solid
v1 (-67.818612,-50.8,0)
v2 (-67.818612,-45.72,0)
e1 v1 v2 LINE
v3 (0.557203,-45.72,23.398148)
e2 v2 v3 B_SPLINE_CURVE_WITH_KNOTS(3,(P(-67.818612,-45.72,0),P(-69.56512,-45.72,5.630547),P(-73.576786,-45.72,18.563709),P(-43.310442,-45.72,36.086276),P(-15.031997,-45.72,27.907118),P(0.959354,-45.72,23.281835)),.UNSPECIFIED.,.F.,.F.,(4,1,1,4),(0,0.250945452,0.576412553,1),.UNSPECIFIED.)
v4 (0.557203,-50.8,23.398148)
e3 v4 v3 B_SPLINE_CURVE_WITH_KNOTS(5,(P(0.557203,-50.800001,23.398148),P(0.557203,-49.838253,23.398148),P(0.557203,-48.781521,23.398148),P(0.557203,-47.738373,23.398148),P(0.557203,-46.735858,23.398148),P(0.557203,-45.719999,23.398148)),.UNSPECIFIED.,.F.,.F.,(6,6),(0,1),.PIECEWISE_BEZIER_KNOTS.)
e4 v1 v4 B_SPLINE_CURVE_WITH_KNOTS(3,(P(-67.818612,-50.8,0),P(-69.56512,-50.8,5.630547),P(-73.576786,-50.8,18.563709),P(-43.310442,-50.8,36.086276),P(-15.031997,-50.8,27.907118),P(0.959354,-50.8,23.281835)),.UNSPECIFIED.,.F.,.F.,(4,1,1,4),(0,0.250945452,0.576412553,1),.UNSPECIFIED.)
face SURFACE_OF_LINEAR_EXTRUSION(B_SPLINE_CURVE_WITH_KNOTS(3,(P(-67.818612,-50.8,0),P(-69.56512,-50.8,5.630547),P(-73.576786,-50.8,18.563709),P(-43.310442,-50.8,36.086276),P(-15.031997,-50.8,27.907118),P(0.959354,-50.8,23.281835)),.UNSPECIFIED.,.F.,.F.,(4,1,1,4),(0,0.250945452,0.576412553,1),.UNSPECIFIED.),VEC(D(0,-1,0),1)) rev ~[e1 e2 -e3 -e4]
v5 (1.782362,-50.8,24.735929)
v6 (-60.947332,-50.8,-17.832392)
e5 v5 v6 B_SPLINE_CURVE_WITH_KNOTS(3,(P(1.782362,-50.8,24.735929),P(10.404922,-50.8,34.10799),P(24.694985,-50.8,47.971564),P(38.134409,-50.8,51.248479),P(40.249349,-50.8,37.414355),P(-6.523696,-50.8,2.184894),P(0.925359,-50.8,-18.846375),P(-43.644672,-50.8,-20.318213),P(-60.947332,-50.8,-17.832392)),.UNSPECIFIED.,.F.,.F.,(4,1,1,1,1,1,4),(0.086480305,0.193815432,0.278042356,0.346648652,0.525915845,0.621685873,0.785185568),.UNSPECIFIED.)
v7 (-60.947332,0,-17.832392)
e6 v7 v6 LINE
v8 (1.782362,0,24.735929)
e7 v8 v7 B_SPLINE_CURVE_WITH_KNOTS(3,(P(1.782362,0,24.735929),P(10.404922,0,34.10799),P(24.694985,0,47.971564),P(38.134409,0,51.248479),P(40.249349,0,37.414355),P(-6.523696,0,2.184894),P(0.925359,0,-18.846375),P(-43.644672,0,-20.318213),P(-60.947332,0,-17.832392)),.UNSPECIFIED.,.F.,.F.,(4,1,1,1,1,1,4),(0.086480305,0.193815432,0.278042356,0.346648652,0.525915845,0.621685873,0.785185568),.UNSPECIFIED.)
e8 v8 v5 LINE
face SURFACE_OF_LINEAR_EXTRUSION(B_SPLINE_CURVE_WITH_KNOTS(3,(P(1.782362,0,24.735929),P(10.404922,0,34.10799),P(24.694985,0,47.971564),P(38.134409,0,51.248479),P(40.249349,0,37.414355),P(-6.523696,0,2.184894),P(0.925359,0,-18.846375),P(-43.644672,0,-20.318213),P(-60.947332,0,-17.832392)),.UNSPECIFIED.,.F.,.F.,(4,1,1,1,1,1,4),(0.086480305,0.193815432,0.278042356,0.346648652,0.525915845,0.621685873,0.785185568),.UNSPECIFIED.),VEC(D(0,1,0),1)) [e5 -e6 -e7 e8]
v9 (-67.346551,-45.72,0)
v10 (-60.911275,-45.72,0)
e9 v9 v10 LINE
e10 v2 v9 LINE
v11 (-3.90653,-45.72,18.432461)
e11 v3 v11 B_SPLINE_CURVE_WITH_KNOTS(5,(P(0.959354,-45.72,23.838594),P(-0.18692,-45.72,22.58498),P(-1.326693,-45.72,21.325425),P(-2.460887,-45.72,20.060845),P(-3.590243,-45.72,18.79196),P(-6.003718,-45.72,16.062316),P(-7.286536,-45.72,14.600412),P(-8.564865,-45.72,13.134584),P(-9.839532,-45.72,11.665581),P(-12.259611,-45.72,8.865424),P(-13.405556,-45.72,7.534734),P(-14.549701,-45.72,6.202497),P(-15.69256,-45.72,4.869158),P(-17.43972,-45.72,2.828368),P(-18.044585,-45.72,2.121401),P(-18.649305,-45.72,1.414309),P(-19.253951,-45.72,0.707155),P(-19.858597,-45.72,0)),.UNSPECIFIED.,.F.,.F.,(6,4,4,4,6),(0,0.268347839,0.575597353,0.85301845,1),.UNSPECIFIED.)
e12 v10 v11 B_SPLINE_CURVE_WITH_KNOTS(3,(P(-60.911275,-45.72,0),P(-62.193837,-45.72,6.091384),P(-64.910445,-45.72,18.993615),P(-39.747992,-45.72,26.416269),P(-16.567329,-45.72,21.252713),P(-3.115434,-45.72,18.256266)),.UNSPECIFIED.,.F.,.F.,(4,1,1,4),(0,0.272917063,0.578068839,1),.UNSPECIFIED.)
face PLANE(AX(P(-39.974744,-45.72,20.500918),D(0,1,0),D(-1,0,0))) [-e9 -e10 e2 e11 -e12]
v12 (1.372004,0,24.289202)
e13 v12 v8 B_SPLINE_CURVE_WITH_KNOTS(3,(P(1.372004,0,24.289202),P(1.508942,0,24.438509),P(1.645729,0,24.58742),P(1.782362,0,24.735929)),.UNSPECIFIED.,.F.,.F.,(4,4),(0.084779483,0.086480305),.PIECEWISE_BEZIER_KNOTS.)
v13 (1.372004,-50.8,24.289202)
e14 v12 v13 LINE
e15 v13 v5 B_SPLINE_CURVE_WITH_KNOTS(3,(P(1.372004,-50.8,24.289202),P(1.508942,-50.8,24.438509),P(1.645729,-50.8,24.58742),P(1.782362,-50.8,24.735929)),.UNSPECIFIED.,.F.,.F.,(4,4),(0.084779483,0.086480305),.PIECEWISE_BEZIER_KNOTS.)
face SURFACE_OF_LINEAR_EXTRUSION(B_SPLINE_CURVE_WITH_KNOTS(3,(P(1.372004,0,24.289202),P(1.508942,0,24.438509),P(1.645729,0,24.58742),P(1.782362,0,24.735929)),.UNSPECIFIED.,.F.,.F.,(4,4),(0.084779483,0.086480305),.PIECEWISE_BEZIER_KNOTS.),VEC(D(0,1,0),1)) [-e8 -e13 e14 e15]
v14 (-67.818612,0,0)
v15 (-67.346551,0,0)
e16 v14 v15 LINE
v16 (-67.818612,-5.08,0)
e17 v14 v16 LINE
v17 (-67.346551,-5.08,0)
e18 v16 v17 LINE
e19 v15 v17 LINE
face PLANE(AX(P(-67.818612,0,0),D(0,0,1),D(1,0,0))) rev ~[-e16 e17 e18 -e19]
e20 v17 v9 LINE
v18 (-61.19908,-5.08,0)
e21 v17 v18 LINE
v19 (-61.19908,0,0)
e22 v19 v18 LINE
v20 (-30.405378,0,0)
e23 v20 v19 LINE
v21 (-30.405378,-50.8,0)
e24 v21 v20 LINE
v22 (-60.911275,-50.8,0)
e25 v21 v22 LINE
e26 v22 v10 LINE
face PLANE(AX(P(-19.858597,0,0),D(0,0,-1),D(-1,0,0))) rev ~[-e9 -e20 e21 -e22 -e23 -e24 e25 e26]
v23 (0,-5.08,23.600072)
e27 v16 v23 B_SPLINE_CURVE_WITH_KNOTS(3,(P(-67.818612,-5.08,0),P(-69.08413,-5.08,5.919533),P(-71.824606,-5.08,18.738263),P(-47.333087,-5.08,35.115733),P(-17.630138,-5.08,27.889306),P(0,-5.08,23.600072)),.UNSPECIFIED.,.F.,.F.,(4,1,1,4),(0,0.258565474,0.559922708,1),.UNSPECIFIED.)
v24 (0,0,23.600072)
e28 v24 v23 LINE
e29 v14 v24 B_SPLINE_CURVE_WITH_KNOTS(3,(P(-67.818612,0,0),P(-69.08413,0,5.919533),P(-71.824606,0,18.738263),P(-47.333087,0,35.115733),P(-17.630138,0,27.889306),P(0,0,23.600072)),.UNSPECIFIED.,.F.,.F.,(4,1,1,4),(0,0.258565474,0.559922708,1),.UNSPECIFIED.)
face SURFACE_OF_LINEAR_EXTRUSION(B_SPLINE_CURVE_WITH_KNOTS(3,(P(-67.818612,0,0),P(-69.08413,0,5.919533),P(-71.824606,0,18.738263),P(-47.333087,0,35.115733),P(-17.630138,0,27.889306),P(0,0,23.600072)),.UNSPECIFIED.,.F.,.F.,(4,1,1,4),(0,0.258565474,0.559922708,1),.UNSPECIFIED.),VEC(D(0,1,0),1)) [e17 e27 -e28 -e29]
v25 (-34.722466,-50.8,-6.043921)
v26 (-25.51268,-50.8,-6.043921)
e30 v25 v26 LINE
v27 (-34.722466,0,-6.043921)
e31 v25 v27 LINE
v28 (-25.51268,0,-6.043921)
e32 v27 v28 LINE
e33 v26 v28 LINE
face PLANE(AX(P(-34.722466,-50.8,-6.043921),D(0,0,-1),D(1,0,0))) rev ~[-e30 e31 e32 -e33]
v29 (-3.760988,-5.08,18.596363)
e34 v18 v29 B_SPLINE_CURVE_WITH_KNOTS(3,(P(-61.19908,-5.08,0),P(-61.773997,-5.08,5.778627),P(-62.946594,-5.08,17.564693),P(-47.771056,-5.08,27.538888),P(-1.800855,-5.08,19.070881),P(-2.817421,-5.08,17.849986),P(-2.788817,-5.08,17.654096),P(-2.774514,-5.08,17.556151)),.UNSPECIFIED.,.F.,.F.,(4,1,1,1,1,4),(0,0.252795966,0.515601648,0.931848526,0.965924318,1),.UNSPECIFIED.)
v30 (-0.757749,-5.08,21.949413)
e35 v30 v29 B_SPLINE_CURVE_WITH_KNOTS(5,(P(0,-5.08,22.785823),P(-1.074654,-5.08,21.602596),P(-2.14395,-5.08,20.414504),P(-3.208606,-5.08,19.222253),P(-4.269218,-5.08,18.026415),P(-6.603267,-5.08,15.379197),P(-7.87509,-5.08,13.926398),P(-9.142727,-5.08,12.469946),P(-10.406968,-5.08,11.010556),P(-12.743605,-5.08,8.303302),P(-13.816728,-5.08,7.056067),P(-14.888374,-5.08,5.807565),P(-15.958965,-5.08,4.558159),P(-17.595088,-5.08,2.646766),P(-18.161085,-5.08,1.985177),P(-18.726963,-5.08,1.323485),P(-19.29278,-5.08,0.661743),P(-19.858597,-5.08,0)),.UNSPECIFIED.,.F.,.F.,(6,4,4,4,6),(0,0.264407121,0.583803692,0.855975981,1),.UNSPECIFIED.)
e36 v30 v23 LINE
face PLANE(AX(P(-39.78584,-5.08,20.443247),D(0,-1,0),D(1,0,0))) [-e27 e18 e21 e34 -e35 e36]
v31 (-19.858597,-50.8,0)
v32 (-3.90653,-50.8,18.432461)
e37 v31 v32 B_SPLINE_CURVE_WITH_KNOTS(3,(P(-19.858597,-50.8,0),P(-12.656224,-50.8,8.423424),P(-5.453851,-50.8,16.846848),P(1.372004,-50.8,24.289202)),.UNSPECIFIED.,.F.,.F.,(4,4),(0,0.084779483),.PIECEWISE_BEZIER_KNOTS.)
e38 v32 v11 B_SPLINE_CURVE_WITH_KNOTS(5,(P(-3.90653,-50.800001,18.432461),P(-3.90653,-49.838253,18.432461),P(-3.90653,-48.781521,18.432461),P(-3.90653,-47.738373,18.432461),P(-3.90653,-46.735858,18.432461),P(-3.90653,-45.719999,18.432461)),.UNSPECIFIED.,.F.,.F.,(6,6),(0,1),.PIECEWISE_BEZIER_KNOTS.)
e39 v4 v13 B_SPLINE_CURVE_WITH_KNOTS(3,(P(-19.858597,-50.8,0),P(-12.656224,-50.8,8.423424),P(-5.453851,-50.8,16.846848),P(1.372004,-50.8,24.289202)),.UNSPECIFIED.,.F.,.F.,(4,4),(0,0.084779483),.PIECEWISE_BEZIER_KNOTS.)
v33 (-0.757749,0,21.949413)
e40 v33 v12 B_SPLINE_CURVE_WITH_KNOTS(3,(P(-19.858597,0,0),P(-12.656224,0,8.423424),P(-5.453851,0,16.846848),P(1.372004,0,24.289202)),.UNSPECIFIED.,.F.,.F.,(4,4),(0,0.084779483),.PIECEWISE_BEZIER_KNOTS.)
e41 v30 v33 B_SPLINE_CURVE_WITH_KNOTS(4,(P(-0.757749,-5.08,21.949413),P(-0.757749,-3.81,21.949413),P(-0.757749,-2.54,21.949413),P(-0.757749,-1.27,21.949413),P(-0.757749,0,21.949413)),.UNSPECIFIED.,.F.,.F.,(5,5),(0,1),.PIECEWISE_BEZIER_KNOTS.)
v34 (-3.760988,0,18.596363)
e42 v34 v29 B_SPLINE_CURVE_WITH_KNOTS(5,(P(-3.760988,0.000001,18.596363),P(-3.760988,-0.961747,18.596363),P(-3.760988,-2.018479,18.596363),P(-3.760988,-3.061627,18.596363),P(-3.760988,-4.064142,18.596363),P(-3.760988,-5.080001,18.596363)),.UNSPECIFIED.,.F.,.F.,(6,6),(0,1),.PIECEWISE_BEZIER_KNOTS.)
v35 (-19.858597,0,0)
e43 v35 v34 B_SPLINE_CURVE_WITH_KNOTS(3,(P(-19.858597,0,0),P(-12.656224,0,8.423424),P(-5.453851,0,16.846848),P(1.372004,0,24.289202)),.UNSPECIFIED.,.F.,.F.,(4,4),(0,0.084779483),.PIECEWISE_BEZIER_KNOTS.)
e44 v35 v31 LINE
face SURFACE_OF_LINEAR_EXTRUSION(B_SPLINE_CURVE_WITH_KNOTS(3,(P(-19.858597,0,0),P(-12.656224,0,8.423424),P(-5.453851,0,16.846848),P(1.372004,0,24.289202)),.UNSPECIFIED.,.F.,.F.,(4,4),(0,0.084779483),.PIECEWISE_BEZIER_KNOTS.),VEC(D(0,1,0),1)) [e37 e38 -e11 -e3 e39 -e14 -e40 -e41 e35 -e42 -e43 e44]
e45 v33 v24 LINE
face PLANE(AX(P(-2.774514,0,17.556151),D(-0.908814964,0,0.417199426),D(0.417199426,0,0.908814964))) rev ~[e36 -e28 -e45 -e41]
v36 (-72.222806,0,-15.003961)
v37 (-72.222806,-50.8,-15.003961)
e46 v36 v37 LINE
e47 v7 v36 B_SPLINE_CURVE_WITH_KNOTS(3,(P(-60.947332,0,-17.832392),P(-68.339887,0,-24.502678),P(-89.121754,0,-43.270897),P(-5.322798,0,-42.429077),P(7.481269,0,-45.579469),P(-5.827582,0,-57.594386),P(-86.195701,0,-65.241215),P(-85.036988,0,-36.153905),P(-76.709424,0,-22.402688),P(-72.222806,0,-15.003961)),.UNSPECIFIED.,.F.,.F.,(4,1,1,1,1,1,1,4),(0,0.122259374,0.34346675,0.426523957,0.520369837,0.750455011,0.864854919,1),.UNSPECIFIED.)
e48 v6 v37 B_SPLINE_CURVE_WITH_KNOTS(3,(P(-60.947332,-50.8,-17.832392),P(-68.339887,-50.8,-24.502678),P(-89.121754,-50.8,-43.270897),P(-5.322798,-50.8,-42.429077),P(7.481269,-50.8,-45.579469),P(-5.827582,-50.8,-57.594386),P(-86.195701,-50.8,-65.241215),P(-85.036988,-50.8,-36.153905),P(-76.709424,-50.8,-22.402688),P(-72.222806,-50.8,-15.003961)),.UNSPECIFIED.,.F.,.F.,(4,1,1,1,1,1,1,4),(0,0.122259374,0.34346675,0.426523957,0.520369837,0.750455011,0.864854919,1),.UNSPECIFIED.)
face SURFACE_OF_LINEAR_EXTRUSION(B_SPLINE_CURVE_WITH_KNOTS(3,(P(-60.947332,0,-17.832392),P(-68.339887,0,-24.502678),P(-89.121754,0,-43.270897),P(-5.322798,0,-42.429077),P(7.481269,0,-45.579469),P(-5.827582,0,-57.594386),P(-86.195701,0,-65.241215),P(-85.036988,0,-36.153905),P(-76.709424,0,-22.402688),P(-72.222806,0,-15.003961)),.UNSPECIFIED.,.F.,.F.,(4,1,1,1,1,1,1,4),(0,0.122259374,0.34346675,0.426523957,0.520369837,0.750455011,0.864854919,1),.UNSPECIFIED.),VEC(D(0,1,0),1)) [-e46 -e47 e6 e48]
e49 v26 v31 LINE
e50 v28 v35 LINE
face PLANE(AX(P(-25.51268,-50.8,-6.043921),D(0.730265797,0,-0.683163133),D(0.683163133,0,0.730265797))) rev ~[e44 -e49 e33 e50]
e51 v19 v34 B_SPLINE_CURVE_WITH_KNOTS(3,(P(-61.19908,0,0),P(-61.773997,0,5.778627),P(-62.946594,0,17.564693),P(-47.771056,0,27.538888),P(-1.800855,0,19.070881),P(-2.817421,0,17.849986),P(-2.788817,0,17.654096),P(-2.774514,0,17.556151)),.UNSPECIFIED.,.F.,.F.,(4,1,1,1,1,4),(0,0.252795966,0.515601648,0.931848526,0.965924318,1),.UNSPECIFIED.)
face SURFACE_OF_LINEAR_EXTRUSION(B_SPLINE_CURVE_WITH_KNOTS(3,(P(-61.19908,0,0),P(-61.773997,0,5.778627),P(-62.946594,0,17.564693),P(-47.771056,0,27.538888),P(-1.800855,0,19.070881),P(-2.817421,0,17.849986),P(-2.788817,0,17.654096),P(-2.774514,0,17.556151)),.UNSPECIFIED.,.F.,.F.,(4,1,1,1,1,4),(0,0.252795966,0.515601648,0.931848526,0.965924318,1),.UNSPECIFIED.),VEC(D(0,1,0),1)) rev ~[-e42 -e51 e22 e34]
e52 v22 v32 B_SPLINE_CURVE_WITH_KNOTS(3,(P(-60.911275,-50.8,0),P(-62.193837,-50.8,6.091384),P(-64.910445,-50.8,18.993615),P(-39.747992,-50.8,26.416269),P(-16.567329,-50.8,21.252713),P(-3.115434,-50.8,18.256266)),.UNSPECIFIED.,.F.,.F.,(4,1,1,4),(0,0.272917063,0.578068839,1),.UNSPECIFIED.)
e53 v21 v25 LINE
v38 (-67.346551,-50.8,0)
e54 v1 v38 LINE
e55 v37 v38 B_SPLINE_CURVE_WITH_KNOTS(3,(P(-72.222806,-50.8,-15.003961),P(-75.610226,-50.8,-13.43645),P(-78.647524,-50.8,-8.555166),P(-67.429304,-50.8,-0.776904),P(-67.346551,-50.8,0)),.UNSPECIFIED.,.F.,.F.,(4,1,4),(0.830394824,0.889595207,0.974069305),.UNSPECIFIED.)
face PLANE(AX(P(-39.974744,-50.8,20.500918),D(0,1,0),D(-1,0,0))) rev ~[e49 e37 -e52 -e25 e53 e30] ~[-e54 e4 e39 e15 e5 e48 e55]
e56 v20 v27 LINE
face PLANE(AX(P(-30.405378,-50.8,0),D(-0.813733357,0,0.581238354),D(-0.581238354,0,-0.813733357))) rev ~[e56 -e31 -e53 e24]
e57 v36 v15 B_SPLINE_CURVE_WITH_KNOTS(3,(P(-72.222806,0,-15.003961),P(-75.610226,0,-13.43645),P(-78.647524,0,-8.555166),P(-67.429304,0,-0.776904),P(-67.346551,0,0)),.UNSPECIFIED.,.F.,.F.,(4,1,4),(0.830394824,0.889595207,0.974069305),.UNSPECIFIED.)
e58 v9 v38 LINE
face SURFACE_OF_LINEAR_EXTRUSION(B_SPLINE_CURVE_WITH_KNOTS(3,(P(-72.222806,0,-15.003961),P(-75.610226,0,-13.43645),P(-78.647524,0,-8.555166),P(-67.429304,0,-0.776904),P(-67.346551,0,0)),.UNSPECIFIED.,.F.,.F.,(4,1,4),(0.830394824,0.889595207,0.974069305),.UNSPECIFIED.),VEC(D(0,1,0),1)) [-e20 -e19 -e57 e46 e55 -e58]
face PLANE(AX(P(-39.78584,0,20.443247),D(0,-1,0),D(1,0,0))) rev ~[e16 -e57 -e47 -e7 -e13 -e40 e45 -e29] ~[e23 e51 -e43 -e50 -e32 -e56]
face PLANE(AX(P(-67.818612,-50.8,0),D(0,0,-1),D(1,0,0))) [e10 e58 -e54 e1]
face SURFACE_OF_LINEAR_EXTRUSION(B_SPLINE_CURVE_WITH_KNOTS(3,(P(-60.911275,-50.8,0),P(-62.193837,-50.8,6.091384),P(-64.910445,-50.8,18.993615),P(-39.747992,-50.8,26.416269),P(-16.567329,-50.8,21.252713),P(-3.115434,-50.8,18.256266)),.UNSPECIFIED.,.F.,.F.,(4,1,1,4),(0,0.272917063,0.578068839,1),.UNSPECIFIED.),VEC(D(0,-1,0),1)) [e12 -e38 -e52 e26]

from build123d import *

# Parameters (mm, degrees)
F1_DEPTH = 50.8
F3_DEPTH = 50.8
F5_DEPTH = 5.08
F8_DEPTH = 5.08


with BuildPart() as f1:
    # F0 (on Front) → F1 (new body)
    with BuildSketch(Plane.XZ):
        with BuildLine():
            add(Edge.make_bspline(
                [(1.3720039788, 24.2892022985), (1.7397140704, 24.3971631629), (1.7582926908, 24.568888641), (1.7823616223, 24.7359291989)],
                knots=[0.9509189129, 0.9509189129, 0.9509189129, 0.9509189129, 1, 1, 1, 1], degree=3))
            add(Edge.make_bspline(
                [(1.3720039788, 24.2892022985), (1.5089424114, 24.4385087599), (1.645729306, 24.5874203671), (1.7823616223, 24.7359291989)],
                knots=[0.0847794827, 0.0847794827, 0.0847794827, 0.0847794827, 0.0864803054, 0.0864803054, 0.0864803054, 0.0864803054], degree=3))
        make_face()
        with BuildLine():
            add(Edge.make_bspline(
                [(1.7823616223, 24.7359291989), (10.4049223213, 34.1079902909), (24.6949847785, 47.9715643142), (38.1344093391, 51.2484791452), (40.2493490628, 37.4143547222), (-6.5236955819, 2.184894081), (0.9253594538, -18.8463747396), (-43.6446723435, -20.3182131852), (-60.9473315781, -17.832391591)],
                knots=[0.0864803054, 0.0864803054, 0.0864803054, 0.0864803054, 0.1938154316, 0.2780423559, 0.3466486519, 0.5259158447, 0.6216858734, 0.7851855678, 0.7851855678, 0.7851855678, 0.7851855678], degree=3))
            add(Edge.make_bspline(
                [(1.3720039788, 24.2892022985), (1.7397140704, 24.3971631629), (1.7582926908, 24.568888641), (1.7823616223, 24.7359291989)],
                knots=[0.9509189129, 0.9509189129, 0.9509189129, 0.9509189129, 1, 1, 1, 1], degree=3))
            add(Edge.make_bspline(
                [(-19.8585968465, 0), (-12.6562240513, 8.4234241533), (-5.4538512561, 16.8468483066), (1.3720039788, 24.2892022985)],
                knots=[0, 0, 0, 0, 0.0847794827, 0.0847794827, 0.0847794827, 0.0847794827], degree=3))
            Line((-19.8585968465, 0), (-59.575792402, 0))
            Line((-59.575792402, 0), (-67.3465505242, 0))
            add(Edge.make_bspline(
                [(-72.2228055042, -15.0039612217), (-75.6102264743, -13.4364498149), (-78.647523508, -8.5551664347), (-67.4293044875, -0.7769035344), (-67.3465505242, 0)],
                knots=[0.8303948244, 0.8303948244, 0.8303948244, 0.8303948244, 0.8895952068, 0.9740693054, 0.9740693054, 0.9740693054, 0.9740693054], degree=3))
            add(Edge.make_bspline(
                [(-60.9473315781, -17.832391591), (-63.6766425714, -17.4402795975), (-67.9897670224, -16.6040196588), (-71.1116634352, -15.5181364254), (-72.2228055042, -15.0039612217)],
                knots=[0.7851855678, 0.7851855678, 0.7851855678, 0.7851855678, 0.8109759107, 0.8303948244, 0.8303948244, 0.8303948244, 0.8303948244], degree=3))
        make_face()
        with BuildLine():
            add(Edge.make_bspline(
                [(-60.9473315781, -17.832391591), (-68.3398865258, -24.5026777809), (-89.1217537647, -43.2708973163), (-5.3227975989, -42.4290767481), (7.4812685723, -45.5794694888), (-5.8275820787, -57.5943863726), (-86.1957011785, -65.2412145747), (-85.0369884931, -36.1539051668), (-76.7094239518, -22.4026879312), (-72.2228055042, -15.0039612217)],
                knots=[0, 0, 0, 0, 0.1222593736, 0.3434667497, 0.4265239574, 0.5203698368, 0.750455011, 0.8648549189, 1, 1, 1, 1], degree=3))
            add(Edge.make_bspline(
                [(-60.9473315781, -17.832391591), (-63.6766425714, -17.4402795975), (-67.9897670224, -16.6040196588), (-71.1116634352, -15.5181364254), (-72.2228055042, -15.0039612217)],
                knots=[0.7851855678, 0.7851855678, 0.7851855678, 0.7851855678, 0.8109759107, 0.8303948244, 0.8303948244, 0.8303948244, 0.8303948244], degree=3))
        make_face()
    extrude(amount=F1_DEPTH)

    # F2 (on face) → F3 (cut)
    with BuildSketch(Plane.XZ.offset(50.8)):
        Polygon((-25.5126804113, -6.0439207591), (-19.8585968465, 0), (-30.4053779691, 0), (-34.7224660218, -6.0439207591), align=None)
    extrude(amount=-F3_DEPTH, mode=Mode.SUBTRACT)

    # F4 (on Front) → F5 (join)
    with BuildSketch(Plane.XZ):
        with BuildLine():
            Line((-67.8186118603, 0), (-61.199080199, 0))
            add(Edge.make_bspline(
                [(-61.199080199, 0), (-61.7739967068, 5.7786274101), (-62.9465941346, 17.5646929419), (-47.7710562815, 27.5388880245), (-1.8008547484, 19.0708813453), (-2.8174213014, 17.8499860268), (-2.7888165903, 17.6540961534), (-2.7745142579, 17.5561513752)],
                knots=[0, 0, 0, 0, 0.2527959656, 0.5156016482, 0.931848526, 0.9659243181, 1, 1, 1, 1], degree=3))
            Line((-2.7745142579, 17.5561513752), (0, 23.6000716686))
            add(Edge.make_bspline(
                [(-67.8186118603, 0), (-69.084130238, 5.9195330657), (-71.8246062407, 18.7382630022), (-47.3330869592, 35.1157333271), (-17.6301382902, 27.8893061256), (0, 23.6000716686)],
                knots=[0, 0, 0, 0, 0.258565474, 0.5599227076, 1, 1, 1, 1], degree=3))
        make_face()
    extrude(amount=F5_DEPTH)

    # F7 (on offset) → F8 (join)
    with BuildSketch(Plane.XZ.offset(50.8)):
        with BuildLine():
            add(Edge.make_bspline(
                [(-67.8186118603, 0), (-69.5651200636, 5.6305472506), (-73.5767857211, 18.5637089699), (-43.3104422795, 36.086276428), (-15.0319972981, 27.9071176477), (0.9593538707, 23.2818350196)],
                knots=[0, 0, 0, 0, 0.2509454521, 0.5764125528, 1, 1, 1, 1], degree=3))
            Line((-67.8186118603, 0), (-60.9112754464, 0))
            add(Edge.make_bspline(
                [(-60.9112754464, 0), (-62.1938366242, 6.0913837059), (-64.9104445252, 18.9936151087), (-39.7479924583, 26.4162692115), (-16.5673294946, 21.2527126033), (-3.1154335011, 18.2562656701)],
                knots=[0, 0, 0, 0, 0.2729170634, 0.5780688388, 1, 1, 1, 1], degree=3))
            Line((-3.1154335011, 18.2562656701), (0.9593538707, 23.2818350196))
        make_face()
    extrude(amount=-F8_DEPTH)


solid = f1.part
